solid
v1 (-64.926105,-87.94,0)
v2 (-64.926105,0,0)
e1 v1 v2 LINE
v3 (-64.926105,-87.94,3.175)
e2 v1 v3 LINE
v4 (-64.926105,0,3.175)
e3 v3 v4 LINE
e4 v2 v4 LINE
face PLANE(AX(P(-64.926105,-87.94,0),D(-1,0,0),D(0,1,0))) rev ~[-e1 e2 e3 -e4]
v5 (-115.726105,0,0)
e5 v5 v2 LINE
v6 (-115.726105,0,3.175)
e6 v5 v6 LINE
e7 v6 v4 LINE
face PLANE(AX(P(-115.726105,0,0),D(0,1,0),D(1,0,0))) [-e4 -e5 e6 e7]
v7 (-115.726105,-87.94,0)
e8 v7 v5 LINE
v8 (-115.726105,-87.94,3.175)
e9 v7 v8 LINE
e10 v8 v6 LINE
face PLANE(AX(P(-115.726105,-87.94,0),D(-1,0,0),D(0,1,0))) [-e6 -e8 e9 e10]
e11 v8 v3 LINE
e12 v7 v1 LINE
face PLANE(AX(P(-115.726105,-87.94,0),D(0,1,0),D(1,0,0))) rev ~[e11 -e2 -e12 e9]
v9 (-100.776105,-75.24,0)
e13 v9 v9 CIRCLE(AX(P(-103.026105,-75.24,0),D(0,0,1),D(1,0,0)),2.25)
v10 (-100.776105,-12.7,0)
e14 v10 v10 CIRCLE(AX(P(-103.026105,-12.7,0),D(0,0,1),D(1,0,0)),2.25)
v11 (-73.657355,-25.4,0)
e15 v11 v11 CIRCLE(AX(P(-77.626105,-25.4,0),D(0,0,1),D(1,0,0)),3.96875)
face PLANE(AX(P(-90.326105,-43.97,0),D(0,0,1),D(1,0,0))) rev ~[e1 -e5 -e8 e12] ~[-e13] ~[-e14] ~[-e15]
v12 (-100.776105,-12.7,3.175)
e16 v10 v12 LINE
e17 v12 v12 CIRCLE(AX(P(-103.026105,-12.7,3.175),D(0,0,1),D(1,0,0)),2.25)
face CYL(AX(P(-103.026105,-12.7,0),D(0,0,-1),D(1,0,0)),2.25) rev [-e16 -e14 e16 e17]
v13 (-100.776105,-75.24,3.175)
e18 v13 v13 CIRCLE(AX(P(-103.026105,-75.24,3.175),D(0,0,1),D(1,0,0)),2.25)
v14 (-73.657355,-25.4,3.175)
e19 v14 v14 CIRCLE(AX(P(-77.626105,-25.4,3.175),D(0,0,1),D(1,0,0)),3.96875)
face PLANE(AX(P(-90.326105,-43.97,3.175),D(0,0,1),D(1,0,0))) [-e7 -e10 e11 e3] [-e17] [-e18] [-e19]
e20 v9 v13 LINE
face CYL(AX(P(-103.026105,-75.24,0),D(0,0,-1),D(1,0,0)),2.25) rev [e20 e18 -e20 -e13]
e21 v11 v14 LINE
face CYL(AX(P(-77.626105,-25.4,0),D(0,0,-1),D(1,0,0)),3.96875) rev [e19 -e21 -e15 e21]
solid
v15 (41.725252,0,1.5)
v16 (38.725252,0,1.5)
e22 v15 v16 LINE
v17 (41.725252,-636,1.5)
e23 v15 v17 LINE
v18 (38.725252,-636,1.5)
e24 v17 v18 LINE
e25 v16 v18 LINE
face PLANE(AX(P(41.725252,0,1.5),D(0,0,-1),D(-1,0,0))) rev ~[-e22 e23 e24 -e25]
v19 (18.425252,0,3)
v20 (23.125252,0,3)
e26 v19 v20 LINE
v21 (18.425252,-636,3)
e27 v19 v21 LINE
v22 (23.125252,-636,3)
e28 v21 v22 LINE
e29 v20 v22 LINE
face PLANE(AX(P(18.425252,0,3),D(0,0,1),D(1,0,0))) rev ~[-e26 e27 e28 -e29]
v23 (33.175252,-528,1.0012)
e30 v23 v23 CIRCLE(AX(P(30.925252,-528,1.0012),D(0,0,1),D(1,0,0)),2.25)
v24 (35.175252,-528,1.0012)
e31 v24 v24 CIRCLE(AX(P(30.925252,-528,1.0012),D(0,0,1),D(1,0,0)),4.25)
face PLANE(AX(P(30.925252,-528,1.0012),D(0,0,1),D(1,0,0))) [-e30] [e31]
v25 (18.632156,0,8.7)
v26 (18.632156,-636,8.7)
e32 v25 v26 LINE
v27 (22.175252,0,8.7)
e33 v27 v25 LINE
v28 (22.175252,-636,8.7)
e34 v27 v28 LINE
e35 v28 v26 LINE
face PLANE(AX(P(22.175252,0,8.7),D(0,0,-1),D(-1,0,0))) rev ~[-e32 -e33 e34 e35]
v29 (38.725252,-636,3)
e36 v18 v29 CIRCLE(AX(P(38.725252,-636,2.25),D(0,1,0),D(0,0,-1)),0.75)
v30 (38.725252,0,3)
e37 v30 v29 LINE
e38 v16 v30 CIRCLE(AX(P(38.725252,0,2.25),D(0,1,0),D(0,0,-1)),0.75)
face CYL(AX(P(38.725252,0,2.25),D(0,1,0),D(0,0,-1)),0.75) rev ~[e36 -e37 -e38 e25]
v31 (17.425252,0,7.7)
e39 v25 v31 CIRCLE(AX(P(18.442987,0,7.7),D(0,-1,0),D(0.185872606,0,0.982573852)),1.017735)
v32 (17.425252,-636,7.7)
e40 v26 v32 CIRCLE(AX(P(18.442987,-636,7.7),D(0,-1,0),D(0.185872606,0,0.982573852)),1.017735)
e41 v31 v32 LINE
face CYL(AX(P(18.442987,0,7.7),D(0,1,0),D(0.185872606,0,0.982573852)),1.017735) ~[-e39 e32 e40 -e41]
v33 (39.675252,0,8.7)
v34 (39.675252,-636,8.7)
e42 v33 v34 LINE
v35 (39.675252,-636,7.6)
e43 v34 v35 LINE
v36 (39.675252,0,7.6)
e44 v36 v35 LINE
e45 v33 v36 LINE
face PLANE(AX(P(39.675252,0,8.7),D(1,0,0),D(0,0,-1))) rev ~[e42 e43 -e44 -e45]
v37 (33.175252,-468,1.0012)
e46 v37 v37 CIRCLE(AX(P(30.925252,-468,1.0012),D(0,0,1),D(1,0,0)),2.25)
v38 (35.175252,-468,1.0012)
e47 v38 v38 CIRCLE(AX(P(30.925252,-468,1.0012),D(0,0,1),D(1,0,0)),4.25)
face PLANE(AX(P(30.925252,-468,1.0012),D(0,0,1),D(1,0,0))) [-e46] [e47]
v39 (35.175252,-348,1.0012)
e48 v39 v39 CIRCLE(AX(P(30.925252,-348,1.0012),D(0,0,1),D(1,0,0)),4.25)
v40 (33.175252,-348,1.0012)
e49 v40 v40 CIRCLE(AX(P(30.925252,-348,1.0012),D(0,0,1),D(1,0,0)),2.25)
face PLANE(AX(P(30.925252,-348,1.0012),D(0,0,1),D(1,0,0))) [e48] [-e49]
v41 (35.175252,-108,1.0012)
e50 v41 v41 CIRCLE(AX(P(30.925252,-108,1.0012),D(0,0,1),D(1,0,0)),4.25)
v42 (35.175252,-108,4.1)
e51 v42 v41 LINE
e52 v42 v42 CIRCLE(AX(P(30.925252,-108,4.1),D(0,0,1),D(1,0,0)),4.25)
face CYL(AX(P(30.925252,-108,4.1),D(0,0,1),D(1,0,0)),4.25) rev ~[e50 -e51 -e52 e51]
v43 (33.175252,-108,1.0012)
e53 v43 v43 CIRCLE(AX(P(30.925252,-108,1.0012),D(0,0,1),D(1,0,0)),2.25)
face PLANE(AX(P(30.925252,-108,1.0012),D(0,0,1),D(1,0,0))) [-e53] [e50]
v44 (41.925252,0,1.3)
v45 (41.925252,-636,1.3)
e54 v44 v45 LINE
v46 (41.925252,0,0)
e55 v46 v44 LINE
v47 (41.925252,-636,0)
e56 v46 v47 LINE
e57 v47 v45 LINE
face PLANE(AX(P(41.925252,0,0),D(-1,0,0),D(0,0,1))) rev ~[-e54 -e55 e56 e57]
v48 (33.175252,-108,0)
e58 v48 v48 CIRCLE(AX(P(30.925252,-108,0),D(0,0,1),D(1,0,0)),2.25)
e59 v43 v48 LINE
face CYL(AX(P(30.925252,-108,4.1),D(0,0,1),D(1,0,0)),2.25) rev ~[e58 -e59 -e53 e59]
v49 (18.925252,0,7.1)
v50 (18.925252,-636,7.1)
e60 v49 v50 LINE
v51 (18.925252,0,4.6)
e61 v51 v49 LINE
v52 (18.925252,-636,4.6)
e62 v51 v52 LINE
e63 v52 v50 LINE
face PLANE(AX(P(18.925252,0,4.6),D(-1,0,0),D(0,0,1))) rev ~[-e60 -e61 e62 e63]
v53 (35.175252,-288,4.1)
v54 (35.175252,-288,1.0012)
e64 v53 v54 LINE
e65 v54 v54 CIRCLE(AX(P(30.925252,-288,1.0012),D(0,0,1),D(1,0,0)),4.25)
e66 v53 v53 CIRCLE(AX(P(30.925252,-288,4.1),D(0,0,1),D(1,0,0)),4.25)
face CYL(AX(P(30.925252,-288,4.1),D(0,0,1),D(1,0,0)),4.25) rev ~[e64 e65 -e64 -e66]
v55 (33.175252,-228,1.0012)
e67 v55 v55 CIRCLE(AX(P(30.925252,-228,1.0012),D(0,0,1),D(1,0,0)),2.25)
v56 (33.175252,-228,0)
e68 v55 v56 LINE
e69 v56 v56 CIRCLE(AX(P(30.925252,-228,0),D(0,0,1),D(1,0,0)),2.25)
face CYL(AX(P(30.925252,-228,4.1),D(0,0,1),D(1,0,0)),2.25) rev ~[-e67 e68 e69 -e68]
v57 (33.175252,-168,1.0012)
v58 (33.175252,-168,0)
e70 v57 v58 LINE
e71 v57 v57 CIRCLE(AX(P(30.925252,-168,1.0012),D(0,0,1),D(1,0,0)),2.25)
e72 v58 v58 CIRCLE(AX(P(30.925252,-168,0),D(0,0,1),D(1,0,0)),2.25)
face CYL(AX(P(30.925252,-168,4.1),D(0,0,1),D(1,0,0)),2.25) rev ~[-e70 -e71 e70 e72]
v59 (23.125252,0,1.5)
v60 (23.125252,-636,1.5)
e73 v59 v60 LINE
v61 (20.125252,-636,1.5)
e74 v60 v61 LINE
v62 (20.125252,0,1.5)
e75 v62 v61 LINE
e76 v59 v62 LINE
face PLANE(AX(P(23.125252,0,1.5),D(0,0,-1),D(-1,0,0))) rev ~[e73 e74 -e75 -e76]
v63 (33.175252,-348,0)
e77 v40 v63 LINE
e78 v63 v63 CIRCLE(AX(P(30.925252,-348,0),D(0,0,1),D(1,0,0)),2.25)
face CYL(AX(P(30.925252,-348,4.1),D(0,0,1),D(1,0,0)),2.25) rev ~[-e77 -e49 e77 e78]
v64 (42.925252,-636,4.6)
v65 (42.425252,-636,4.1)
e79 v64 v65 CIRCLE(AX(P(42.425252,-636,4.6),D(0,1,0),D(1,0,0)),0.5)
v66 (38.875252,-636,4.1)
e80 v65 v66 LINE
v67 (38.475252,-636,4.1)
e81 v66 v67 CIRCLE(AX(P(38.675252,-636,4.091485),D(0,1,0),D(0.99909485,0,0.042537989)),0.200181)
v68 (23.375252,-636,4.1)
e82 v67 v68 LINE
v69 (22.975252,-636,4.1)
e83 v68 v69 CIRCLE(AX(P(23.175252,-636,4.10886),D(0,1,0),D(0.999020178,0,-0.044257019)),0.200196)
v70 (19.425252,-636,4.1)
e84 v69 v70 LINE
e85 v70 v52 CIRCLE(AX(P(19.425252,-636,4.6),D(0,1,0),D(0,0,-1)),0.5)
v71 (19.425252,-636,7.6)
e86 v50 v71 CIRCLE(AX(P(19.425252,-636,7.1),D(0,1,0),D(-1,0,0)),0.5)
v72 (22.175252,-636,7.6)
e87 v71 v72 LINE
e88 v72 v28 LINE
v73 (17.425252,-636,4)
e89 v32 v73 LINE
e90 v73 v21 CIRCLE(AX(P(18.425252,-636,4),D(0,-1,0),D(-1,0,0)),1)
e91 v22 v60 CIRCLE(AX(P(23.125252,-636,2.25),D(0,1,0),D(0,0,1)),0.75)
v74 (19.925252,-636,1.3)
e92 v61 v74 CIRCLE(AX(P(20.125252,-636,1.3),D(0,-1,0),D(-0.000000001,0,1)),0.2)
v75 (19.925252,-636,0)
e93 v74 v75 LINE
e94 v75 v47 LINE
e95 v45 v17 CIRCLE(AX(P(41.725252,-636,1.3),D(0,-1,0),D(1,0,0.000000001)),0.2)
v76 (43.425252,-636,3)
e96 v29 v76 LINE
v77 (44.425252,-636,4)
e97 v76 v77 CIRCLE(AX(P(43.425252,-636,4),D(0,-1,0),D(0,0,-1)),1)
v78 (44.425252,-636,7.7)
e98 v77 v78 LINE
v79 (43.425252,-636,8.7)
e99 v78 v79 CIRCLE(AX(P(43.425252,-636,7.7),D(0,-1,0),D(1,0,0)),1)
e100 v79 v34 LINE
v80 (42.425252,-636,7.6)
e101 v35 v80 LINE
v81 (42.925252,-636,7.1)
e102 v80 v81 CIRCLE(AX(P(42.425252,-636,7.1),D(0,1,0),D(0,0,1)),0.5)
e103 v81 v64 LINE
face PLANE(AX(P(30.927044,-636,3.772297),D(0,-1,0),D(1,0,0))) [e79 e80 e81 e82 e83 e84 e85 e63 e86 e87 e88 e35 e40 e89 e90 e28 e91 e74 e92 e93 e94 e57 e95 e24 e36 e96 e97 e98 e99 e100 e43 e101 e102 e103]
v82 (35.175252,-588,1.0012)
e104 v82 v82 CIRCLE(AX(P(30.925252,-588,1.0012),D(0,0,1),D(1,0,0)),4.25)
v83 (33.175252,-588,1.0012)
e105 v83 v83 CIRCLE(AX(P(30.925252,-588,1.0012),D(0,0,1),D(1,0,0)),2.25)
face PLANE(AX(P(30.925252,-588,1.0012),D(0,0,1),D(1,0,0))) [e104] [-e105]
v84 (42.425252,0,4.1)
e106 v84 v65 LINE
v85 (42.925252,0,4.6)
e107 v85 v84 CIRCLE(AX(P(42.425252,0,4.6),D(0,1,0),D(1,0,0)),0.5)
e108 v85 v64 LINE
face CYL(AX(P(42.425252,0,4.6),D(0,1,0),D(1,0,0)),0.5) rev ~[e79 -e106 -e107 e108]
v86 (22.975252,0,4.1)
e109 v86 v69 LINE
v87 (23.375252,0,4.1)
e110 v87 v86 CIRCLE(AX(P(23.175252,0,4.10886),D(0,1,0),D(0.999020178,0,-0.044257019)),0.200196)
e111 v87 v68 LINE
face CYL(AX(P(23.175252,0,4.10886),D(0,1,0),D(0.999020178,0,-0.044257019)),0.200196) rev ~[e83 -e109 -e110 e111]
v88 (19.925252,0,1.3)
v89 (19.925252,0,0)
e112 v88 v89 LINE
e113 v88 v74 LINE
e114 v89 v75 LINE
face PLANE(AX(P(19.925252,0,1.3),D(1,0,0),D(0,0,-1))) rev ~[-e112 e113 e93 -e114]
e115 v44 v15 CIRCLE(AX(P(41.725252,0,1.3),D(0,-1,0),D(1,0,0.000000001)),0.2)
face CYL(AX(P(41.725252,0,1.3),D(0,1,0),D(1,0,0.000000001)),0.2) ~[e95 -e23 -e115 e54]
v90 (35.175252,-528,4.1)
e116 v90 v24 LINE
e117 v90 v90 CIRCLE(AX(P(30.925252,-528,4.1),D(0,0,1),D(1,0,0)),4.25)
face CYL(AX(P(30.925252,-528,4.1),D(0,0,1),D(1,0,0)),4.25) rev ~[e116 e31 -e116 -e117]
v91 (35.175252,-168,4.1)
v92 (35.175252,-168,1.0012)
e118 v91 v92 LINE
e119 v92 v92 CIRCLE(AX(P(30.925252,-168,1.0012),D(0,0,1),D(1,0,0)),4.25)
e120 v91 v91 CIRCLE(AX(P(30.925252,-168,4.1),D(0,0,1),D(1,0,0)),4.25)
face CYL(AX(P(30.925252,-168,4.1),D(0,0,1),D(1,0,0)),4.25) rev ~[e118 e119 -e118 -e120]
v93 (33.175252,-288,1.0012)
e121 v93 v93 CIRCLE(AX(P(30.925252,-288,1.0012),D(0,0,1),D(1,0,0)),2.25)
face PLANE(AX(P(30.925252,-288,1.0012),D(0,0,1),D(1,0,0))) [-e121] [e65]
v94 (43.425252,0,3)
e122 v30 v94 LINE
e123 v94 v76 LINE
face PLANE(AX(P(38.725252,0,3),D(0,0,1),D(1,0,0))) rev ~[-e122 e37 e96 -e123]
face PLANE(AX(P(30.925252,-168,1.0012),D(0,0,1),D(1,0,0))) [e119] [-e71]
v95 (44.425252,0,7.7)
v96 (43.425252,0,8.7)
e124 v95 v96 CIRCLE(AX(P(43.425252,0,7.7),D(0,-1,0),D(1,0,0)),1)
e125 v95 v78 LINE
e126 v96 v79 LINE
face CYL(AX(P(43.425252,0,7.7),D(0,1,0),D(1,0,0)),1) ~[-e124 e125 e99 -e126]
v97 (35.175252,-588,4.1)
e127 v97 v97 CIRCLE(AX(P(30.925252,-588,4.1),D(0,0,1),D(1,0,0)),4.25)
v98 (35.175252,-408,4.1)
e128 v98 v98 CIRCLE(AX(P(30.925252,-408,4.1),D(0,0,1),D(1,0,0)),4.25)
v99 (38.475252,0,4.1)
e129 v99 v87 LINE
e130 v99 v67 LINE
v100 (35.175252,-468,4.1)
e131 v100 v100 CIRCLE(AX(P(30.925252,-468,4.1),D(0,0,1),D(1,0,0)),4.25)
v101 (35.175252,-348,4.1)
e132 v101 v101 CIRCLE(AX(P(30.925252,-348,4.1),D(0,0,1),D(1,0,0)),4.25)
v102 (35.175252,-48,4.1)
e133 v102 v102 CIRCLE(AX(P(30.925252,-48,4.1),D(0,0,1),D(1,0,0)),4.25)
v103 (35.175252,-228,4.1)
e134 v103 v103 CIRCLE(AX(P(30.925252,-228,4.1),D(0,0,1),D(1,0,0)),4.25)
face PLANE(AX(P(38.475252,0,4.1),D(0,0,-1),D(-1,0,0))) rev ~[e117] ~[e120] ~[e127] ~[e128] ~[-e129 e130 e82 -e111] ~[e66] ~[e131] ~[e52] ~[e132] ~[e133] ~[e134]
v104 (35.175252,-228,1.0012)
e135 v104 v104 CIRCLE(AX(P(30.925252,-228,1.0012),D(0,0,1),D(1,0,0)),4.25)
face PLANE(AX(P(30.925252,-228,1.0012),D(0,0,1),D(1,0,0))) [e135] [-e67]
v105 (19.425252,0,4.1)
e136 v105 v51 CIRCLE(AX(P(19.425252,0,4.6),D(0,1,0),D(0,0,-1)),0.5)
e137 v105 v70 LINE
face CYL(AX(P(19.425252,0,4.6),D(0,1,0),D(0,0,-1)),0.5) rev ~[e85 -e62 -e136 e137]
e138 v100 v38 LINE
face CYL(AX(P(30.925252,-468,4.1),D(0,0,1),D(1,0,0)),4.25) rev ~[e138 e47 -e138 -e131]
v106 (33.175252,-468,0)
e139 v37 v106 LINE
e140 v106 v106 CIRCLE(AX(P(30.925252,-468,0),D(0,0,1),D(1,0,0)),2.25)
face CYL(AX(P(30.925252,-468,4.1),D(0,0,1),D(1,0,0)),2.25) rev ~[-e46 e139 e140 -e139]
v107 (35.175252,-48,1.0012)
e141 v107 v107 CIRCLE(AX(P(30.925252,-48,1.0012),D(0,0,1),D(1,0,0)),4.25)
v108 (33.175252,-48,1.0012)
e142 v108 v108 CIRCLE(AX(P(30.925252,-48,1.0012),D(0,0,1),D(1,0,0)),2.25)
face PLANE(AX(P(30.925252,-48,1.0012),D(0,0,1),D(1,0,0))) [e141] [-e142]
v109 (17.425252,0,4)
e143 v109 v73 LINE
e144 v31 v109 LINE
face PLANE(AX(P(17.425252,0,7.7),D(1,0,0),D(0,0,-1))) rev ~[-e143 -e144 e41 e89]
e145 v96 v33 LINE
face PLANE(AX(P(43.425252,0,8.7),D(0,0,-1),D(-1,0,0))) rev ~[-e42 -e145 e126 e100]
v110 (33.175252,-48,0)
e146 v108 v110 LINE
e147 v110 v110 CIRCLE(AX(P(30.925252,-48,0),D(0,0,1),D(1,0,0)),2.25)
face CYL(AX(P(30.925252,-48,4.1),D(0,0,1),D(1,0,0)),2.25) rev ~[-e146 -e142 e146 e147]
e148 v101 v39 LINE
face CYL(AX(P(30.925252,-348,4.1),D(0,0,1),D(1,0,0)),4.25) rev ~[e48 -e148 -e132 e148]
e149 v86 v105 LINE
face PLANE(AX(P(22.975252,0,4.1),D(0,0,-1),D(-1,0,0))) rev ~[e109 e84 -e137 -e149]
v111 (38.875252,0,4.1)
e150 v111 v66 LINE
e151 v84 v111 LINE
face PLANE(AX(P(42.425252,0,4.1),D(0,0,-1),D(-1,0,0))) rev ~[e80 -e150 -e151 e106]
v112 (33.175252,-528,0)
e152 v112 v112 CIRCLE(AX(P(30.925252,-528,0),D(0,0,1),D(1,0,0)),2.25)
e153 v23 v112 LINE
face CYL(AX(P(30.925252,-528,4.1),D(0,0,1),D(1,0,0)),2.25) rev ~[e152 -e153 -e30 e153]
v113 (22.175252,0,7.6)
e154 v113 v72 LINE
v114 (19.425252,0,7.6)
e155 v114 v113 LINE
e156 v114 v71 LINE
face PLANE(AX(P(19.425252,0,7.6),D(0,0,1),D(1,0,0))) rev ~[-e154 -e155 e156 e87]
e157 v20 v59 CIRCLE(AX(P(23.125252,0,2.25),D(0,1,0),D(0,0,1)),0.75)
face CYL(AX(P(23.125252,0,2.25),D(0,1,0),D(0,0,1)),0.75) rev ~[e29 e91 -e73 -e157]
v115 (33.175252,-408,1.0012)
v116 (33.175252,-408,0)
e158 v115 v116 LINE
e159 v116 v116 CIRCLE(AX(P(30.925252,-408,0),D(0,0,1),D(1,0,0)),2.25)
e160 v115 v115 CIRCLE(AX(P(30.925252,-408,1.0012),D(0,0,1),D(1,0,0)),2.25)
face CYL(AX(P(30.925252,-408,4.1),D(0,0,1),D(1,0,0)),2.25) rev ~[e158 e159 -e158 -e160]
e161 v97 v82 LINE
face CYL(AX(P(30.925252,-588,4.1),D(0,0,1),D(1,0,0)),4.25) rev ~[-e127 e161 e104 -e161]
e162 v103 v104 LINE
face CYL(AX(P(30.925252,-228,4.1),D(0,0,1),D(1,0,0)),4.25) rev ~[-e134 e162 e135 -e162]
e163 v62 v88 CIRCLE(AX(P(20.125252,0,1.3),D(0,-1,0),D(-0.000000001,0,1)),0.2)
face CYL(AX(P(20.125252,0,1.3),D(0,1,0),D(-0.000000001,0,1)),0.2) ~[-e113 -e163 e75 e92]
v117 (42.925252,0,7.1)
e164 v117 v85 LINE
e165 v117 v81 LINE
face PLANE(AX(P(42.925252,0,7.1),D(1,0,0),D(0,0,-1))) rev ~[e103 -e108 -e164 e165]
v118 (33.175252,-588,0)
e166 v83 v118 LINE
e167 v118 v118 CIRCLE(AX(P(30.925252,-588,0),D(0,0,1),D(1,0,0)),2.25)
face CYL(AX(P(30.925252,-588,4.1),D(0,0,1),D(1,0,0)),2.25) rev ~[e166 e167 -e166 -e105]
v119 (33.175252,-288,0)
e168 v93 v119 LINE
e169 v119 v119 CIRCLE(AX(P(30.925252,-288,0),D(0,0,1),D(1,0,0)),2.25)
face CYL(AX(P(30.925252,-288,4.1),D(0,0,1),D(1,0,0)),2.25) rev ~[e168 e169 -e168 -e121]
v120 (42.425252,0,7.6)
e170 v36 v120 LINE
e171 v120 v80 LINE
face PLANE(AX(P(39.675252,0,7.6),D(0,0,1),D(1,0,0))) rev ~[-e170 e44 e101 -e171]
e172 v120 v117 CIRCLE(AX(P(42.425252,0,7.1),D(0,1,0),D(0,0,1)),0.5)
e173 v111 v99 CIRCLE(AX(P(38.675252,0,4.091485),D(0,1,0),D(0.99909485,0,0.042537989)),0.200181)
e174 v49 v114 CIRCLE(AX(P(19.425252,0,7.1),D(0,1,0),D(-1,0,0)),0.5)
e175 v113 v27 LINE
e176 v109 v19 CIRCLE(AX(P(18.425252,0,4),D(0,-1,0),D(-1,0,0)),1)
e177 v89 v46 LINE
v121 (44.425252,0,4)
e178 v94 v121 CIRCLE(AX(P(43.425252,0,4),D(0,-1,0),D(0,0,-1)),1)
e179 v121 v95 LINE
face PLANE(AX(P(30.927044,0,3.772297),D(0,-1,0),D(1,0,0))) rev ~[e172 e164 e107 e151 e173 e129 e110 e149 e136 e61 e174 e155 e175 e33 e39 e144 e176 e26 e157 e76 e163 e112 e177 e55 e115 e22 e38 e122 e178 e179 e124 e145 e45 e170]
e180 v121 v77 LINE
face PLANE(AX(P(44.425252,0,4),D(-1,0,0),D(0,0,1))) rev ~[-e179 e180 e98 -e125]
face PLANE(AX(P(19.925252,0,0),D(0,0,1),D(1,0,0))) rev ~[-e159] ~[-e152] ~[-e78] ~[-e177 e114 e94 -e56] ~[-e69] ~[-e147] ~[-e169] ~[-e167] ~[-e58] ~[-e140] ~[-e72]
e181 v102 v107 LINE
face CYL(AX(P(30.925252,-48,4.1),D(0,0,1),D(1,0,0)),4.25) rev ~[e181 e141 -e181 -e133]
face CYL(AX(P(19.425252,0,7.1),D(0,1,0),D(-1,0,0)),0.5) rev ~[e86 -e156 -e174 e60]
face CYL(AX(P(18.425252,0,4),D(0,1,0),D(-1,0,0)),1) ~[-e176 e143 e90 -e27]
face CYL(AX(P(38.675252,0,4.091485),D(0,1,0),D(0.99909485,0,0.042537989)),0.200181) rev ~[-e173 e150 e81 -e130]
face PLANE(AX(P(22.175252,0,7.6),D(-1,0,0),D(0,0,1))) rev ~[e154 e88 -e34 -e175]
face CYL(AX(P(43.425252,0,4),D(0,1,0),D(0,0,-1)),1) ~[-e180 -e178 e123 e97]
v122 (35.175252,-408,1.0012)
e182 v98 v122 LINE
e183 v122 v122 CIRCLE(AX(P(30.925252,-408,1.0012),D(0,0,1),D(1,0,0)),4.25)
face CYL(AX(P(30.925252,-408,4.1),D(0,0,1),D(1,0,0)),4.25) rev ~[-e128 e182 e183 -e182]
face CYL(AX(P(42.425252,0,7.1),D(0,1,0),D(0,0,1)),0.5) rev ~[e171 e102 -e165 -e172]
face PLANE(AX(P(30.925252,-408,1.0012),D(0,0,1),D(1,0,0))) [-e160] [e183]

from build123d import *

# Parameters (mm, degrees)
F1_DEPTH = 636
F2_R     = 2.25
F3_DEPTH = 4.101
F2_R_2   = 4.25
F4_DEPTH = 3.0988
F5_W     = 50.8
F5_H     = 87.939999888
F5_R     = 2.25
F5_R_2   = 3.96875
F6_DEPTH = 3.175


# Not quite as in the source:
# - a feature names something its author has since deleted; it is built from what else it names


with BuildPart() as f1:
    # F0 (on Front) → F1 (new body)
    with BuildSketch(Plane.XZ):
        with BuildLine():
            Line((22.9752515742, 4.1), (19.4252515742, 4.1))
            ThreePointArc((19.4252515742, 4.1), (19.0716981836, 4.2464466094), (18.9252515742, 4.6))
            Line((18.9252515742, 4.6), (18.9252515742, 7.1))
            ThreePointArc((18.9252515742, 7.1), (19.0716981836, 7.4535533906), (19.4252515742, 7.6))
            Line((19.4252515742, 7.6), (22.1752515742, 7.6))
            Line((22.1752515742, 7.6), (22.1752515742, 8.7))
            Line((22.1752515742, 8.7), (18.6321558738, 8.7))
            ThreePointArc((18.6321558738, 8.7), (17.7936560083, 8.4836800987), (17.4252515742, 7.7))
            Line((17.4252515742, 7.7), (17.4252515742, 4))
            ThreePointArc((17.4252515742, 4), (17.718144793, 3.2928932188), (18.4252515742, 3))
            Line((18.4252515742, 3), (23.1252515742, 3))
            ThreePointArc((23.1252515742, 3), (23.8752515742, 2.25), (23.1252515742, 1.5))
            Line((23.1252515742, 1.5), (20.1252515742, 1.5))
            ThreePointArc((20.1252515742, 1.5), (19.983830218, 1.4414213562), (19.9252515742, 1.3))
            Line((19.9252515742, 1.3), (19.9252515742, 0))
            Line((19.9252515742, 0), (41.9252515742, 0))
            Line((41.9252515742, 0), (41.9252515742, 1.3))
            ThreePointArc((41.9252515742, 1.3), (41.8666729304, 1.4414213562), (41.7252515742, 1.5))
            Line((41.7252515742, 1.5), (38.7252515742, 1.5))
            ThreePointArc((38.7252515742, 1.5), (37.9752515742, 2.25), (38.7252515742, 3))
            Line((38.7252515742, 3), (38.9860151642, 3))
            Line((38.9860151642, 3), (43.4252515742, 3))
            ThreePointArc((43.4252515742, 3), (44.1323583554, 3.2928932188), (44.4252515742, 4))
            Line((44.4252515742, 4), (44.4252515742, 7.7))
            ThreePointArc((44.4252515742, 7.7), (44.1323583554, 8.4071067812), (43.4252515742, 8.7))
            Line((43.4252515742, 8.7), (39.6752515742, 8.7))
            Line((39.6752515742, 8.7), (39.6752515742, 7.6))
            Line((39.6752515742, 7.6), (42.4252515742, 7.6))
            ThreePointArc((42.4252515742, 7.6), (42.7788049648, 7.4535533906), (42.9252515742, 7.1))
            Line((42.9252515742, 7.1), (42.9252515742, 4.6))
            ThreePointArc((42.9252515742, 4.6), (42.7788049648, 4.2464466094), (42.4252515742, 4.1))
            Line((42.4252515742, 4.1), (38.8752515742, 4.1))
            ThreePointArc((38.8752515742, 4.1), (38.6752515742, 3.8913035005), (38.4752515742, 4.1))
            Line((38.4752515742, 4.1), (23.3752515742, 4.1))
            ThreePointArc((23.3752515742, 4.1), (23.1752515742, 3.9086639286), (22.9752515742, 4.1))
        make_face()
    extrude(amount=F1_DEPTH)

    # F2 (on face) → F3 (cut, through all)
    with BuildSketch(Plane.XY.offset(4.1)):
        with Locations((30.9252515742, -48)):
            Circle(F2_R)
        with Locations((30.9252515742, -108)):
            Circle(F2_R)
        with Locations((30.9252515742, -168)):
            Circle(F2_R)
        with Locations((30.9252515742, -228)):
            Circle(F2_R)
        with Locations((30.9252515742, -288)):
            Circle(F2_R)
        with Locations((30.9252515742, -348)):
            Circle(F2_R)
        with Locations((30.9252515742, -408)):
            Circle(F2_R)
        with Locations((30.9252515742, -468)):
            Circle(F2_R)
        with Locations((30.9252515742, -528)):
            Circle(F2_R)
        with Locations((30.9252515742, -588)):
            Circle(F2_R)
    extrude(amount=-F3_DEPTH, mode=Mode.SUBTRACT)

    # F2 (on face) → F4 (cut)
    with BuildSketch(Plane.XY.offset(4.1)):
        with Locations((30.9252515742, -108)):
            Circle(F2_R_2)
        with Locations((30.9252515742, -108)):
            Circle(F2_R, mode=Mode.SUBTRACT)
        with Locations((30.9252515742, -48)):
            Circle(F2_R_2)
        with Locations((30.9252515742, -48)):
            Circle(F2_R, mode=Mode.SUBTRACT)
        with Locations((30.9252515742, -168)):
            Circle(F2_R_2)
        with Locations((30.9252515742, -168)):
            Circle(F2_R, mode=Mode.SUBTRACT)
        with Locations((30.9252515742, -228)):
            Circle(F2_R_2)
        with Locations((30.9252515742, -228)):
            Circle(F2_R, mode=Mode.SUBTRACT)
        with Locations((30.9252515742, -288)):
            Circle(F2_R_2)
        with Locations((30.9252515742, -288)):
            Circle(F2_R, mode=Mode.SUBTRACT)
        with Locations((30.9252515742, -348)):
            Circle(F2_R_2)
        with Locations((30.9252515742, -348)):
            Circle(F2_R, mode=Mode.SUBTRACT)
        with Locations((30.9252515742, -408)):
            Circle(F2_R_2)
        with Locations((30.9252515742, -408)):
            Circle(F2_R, mode=Mode.SUBTRACT)
        with Locations((30.9252515742, -468)):
            Circle(F2_R_2)
        with Locations((30.9252515742, -468)):
            Circle(F2_R, mode=Mode.SUBTRACT)
        with Locations((30.9252515742, -528)):
            Circle(F2_R_2)
        with Locations((30.9252515742, -528)):
            Circle(F2_R, mode=Mode.SUBTRACT)
        with Locations((30.9252515742, -588)):
            Circle(F2_R_2)
        with Locations((30.9252515742, -588)):
            Circle(F2_R, mode=Mode.SUBTRACT)
    extrude(amount=-F4_DEPTH, mode=Mode.SUBTRACT)


with BuildPart() as f6:
    # F5 (on Top) → F6 (new body)
    with BuildSketch(Plane.XY):
        with Locations((-90.3261050073, -43.969999944)):
            Rectangle(F5_W, F5_H)
        with Locations((-103.0261050073, -75.239999888)):
            Circle(F5_R, mode=Mode.SUBTRACT)
        with Locations((-103.0261050073, -12.7)):
            Circle(F5_R, mode=Mode.SUBTRACT)
        with Locations((-77.6261050073, -25.4)):
            Circle(F5_R_2, mode=Mode.SUBTRACT)
    extrude(amount=F6_DEPTH)


solid = Compound([f1.part, f6.part])
